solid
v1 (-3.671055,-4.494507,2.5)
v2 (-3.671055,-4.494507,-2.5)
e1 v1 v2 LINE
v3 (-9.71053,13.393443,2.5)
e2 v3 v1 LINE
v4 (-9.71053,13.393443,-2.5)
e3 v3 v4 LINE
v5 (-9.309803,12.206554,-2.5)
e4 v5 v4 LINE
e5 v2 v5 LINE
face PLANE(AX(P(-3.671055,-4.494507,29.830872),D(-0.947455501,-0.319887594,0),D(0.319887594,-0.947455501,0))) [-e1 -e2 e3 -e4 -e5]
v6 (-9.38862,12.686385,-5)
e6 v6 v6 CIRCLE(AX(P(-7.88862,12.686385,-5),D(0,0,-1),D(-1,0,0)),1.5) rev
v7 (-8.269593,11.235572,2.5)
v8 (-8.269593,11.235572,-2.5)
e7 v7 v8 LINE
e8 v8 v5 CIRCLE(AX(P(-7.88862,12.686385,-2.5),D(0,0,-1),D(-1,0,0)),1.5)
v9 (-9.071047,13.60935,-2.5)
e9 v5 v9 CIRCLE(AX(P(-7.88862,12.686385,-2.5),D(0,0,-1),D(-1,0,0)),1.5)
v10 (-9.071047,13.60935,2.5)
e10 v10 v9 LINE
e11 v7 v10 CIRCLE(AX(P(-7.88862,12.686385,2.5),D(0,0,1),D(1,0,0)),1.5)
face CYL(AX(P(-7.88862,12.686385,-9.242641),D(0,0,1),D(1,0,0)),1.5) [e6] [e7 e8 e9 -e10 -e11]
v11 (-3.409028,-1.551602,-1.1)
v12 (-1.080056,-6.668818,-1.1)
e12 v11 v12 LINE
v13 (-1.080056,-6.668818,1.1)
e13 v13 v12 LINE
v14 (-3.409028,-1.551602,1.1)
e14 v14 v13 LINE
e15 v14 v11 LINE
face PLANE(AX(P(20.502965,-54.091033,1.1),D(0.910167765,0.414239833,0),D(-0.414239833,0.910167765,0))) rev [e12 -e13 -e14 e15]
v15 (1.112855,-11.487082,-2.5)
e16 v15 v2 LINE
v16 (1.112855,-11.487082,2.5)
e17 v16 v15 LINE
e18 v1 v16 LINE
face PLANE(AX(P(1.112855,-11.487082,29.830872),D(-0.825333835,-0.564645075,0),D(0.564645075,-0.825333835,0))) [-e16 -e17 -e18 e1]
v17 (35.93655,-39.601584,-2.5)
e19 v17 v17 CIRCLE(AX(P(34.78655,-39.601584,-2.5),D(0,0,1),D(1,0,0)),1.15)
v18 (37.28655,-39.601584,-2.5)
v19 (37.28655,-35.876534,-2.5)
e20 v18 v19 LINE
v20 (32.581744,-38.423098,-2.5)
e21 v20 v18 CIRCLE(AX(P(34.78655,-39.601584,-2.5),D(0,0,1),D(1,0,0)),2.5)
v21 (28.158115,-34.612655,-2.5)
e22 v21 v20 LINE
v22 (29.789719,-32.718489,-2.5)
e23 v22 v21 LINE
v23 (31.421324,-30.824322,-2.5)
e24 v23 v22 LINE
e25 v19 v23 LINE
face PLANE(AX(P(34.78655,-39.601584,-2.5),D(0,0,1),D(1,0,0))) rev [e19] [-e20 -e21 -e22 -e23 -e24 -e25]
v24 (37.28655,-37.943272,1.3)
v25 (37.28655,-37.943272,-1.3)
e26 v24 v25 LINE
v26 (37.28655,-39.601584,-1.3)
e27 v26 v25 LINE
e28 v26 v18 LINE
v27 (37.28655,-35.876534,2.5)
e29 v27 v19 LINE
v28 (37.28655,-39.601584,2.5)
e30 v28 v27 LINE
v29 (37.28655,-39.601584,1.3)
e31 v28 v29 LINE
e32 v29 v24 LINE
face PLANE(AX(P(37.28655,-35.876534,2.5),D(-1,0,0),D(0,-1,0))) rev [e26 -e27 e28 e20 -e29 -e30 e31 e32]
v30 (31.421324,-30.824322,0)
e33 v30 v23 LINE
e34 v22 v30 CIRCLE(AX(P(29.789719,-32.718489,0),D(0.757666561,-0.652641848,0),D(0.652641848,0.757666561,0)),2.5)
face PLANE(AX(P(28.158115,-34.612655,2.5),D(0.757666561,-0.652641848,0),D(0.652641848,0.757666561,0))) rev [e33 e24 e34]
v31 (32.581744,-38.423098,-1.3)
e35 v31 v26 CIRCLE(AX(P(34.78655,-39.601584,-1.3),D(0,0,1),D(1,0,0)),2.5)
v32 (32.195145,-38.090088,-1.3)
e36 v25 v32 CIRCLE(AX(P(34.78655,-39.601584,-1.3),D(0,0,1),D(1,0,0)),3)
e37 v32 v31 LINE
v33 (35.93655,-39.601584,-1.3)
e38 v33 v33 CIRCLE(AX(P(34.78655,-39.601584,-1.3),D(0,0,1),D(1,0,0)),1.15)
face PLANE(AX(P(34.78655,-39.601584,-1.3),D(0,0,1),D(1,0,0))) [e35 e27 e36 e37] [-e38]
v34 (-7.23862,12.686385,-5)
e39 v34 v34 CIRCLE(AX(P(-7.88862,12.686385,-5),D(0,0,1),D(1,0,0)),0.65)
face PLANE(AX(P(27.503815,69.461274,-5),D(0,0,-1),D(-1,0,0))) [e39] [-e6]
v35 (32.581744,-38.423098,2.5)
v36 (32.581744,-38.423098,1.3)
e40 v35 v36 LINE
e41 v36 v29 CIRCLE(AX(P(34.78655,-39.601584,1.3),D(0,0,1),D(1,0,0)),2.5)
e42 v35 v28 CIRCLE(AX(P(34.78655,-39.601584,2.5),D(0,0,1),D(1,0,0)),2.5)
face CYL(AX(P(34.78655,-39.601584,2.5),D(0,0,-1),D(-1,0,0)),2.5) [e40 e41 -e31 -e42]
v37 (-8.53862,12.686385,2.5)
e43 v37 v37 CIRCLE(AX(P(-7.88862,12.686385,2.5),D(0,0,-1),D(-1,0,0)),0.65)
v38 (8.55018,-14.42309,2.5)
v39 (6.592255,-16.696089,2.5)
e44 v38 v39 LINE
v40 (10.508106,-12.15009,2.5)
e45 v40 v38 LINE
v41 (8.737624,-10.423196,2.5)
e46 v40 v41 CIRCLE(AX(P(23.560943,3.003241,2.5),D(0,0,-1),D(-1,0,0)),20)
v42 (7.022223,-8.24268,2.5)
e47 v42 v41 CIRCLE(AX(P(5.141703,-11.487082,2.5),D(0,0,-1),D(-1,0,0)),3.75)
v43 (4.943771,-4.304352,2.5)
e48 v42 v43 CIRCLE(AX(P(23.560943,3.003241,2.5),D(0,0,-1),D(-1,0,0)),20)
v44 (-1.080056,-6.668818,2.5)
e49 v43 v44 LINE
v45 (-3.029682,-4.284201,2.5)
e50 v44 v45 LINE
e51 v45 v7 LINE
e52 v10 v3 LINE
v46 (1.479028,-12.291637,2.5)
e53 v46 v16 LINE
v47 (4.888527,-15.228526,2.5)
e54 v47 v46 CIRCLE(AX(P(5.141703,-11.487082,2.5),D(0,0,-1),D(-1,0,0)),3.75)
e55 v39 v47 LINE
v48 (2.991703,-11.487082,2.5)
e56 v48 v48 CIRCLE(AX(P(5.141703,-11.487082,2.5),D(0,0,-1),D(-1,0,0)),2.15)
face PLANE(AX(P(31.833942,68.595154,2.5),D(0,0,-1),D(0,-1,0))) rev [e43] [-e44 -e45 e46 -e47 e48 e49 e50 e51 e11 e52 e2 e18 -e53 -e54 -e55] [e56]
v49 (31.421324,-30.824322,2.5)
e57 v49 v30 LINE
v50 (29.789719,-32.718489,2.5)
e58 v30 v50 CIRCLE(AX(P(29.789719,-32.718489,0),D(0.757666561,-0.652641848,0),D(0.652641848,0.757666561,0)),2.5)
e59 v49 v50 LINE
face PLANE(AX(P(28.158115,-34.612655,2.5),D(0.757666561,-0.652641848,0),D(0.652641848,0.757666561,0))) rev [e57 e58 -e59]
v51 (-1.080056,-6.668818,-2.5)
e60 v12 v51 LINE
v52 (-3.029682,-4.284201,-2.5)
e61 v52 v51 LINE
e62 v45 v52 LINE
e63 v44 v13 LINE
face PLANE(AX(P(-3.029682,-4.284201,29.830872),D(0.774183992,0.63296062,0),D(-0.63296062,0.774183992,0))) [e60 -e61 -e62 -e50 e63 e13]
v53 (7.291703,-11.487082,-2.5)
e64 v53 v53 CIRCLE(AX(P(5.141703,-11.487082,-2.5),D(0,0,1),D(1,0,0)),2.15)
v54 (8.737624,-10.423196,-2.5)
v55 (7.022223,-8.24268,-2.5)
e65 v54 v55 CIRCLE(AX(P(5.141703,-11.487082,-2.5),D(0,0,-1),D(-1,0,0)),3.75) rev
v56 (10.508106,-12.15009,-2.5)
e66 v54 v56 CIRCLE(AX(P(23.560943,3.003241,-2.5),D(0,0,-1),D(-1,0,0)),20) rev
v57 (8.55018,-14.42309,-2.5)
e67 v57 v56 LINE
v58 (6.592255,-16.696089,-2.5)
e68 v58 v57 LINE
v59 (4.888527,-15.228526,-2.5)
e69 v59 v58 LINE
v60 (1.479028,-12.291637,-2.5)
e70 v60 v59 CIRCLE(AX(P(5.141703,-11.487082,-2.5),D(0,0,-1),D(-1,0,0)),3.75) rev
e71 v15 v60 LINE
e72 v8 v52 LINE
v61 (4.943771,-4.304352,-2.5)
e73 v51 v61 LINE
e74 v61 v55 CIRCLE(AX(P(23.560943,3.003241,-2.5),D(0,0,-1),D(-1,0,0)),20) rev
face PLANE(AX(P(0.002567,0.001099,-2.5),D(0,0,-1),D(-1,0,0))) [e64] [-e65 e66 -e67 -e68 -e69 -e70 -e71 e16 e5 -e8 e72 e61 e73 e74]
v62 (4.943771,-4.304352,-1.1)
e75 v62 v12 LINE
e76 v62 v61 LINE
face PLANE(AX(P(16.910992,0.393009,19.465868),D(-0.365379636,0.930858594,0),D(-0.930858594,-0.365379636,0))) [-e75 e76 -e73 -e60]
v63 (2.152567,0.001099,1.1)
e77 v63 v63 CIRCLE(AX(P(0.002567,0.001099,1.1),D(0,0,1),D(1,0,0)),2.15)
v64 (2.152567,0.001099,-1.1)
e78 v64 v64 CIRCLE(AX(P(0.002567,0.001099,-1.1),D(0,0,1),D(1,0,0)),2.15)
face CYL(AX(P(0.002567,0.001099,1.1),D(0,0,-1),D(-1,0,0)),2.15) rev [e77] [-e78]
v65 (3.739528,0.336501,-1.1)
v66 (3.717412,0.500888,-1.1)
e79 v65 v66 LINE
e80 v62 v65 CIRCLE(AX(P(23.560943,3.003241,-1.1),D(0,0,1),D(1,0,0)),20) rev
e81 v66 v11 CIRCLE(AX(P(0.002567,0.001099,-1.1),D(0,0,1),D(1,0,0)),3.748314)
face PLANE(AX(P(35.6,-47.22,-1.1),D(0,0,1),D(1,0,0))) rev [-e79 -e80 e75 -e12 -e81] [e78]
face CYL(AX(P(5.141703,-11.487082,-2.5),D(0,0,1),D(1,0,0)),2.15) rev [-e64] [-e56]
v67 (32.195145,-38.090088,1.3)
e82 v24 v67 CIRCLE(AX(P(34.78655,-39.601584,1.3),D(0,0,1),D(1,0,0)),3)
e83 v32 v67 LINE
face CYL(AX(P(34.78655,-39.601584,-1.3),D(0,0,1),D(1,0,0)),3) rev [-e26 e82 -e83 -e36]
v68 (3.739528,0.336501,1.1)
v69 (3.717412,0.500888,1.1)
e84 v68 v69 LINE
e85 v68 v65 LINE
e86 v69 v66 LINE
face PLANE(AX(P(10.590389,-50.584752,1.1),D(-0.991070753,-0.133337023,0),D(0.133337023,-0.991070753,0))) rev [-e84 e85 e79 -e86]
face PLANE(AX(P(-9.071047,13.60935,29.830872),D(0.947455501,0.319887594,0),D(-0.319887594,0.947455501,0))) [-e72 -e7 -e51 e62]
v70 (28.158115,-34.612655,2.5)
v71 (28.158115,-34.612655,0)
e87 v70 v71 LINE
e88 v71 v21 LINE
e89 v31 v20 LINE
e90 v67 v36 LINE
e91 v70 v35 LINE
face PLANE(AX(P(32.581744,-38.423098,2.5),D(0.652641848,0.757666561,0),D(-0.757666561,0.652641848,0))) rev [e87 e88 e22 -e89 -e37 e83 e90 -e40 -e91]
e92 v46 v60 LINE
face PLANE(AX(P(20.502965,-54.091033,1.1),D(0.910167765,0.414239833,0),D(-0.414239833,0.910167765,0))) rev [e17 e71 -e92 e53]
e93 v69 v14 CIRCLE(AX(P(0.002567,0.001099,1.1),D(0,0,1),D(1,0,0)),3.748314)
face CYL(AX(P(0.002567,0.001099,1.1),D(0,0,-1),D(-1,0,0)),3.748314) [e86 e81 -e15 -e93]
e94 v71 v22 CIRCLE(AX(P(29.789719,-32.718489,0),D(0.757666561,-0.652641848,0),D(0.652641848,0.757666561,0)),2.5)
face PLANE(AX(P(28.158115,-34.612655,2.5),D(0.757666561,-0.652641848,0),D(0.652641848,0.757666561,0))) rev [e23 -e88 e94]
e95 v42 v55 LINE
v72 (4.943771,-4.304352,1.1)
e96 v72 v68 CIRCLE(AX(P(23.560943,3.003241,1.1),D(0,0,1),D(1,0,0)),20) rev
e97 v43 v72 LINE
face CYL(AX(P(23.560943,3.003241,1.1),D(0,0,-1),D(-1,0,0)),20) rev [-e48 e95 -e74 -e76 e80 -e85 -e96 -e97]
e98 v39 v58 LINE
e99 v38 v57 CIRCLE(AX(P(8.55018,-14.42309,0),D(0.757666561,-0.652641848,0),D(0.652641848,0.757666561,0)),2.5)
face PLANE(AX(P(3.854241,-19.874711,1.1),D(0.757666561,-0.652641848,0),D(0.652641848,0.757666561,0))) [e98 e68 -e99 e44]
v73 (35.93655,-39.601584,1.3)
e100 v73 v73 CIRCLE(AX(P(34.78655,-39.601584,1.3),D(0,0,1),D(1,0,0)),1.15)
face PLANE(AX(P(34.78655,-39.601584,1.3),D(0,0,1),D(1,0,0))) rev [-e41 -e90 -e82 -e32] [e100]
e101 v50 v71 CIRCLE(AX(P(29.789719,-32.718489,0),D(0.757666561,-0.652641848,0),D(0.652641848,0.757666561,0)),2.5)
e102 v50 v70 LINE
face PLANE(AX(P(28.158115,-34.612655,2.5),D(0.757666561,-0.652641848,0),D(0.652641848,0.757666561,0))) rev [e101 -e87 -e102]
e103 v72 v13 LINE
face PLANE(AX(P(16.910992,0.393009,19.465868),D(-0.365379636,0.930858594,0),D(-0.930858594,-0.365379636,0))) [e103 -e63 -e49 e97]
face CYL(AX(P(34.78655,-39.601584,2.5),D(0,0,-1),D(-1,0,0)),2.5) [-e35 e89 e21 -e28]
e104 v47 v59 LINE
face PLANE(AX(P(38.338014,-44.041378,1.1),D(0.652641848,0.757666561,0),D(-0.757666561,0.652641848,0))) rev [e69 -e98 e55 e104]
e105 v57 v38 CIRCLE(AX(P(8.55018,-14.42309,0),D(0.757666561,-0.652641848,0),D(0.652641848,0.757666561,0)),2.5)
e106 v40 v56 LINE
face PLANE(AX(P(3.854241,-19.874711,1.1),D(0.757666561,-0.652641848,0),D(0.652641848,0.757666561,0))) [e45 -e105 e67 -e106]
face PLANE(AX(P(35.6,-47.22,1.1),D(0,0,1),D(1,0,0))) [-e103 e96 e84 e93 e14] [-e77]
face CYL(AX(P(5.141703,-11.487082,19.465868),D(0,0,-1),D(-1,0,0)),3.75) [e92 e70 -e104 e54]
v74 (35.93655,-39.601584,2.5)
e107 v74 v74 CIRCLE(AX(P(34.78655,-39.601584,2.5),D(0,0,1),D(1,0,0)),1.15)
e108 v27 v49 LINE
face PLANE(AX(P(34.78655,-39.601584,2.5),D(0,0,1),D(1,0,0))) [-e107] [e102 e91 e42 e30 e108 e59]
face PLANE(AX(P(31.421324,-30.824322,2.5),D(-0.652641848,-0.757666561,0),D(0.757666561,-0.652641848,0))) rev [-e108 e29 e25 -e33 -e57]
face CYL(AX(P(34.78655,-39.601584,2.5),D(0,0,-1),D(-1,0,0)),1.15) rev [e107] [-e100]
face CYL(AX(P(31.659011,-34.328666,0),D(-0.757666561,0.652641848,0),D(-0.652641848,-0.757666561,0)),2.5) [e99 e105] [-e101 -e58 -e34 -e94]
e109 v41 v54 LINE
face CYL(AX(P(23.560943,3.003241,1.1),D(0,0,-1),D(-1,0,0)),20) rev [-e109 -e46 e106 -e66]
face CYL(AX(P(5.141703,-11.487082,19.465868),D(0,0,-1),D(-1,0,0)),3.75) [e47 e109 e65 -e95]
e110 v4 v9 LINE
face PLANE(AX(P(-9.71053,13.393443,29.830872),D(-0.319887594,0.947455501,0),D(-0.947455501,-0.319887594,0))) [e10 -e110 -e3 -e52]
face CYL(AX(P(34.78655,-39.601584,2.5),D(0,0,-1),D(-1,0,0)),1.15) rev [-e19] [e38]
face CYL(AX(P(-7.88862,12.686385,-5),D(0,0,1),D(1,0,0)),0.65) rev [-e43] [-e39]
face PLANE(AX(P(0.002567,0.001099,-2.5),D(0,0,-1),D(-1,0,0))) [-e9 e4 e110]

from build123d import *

# Parameters (mm, degrees)
SKETCH1_R               = 3.748314074
SKETCH1_R_2             = 2.15
BOSS_EXTRUDE1_DEPTH     = 1.1
BOSS_EXTRUDE2_START     = -2.5
BOSS_EXTRUDE2_DEPTH     = 5
SKETCH3_R               = 2.5
BOSS_EXTRUDE3_DEPTH     = 30.5
BOSS_EXTRUDE4_REACH     = 66.583
CUT_EXTRUDE1_DEPTH      = 77.014827373
CUT_EXTRUDE1_DEPTH_BACK = 77.014827373
SKETCH5_R               = 2.15
SKETCH6_R               = 1.15
BOSS_EXTRUDE5_DEPTH     = 2.5
SKETCH7_R               = 3
CUT_EXTRUDE2_DEPTH      = 1.3
SKETCH8_R               = 1.5
BOSS_EXTRUDE6_DEPTH     = 7.5
CUT_EXTRUDE3_DEPTH      = 77.681407452
CUT_EXTRUDE3_DEPTH_BACK = 77.681407452
SKETCH9_R               = 0.65


# Read off the part's stored shape, not the designer's step: Boss-Extrude2
with BuildPart() as part:
    # Sketch1 → Boss-Extrude1 (new, symmetric)
    # profile 1 of 2: a face of its own
    with BuildSketch(Plane.XY):
        with BuildLine():
            Line((-29.007745084, 30.523910578), (-25.091893995, 35.069909945))
            ThreePointArc((-25.091893995, 35.069909945), (-29.621942143, 40.692126277), (-31.860472098, 47.55650071))
            Line((-31.860472098, 47.55650071), (-31.88258847, 47.720887837))
            ThreePointArc((-31.88258847, 47.720887837), (-31.857495615, 47.471553034), (-31.84911885, 47.221098797))
            ThreePointArc((-31.84911885, 47.221098797), (-34.80303687, 43.557931682), (-39.009027568, 45.6683978))
            Line((-39.009027568, 45.6683978), (-34.12097225, 34.928362615))
            Line((-34.12097225, 34.928362615), (-29.007745084, 30.523910578))
        make_face()
    # profile 2 of 2: a face of its own
    with BuildSketch(Plane.XY):
        with Locations((-35.597432924, 47.221098797)):
            Circle(SKETCH1_R)
        with Locations((-35.597432924, 47.221098797)):
            Circle(SKETCH1_R_2, mode=Mode.SUBTRACT)
    extrude(amount=BOSS_EXTRUDE1_DEPTH, both=True)

    # Boss-Extrude2 outline → Boss-Extrude2 (add)
    with BuildSketch(Plane.XY.offset(BOSS_EXTRUDE2_START)):
        with BuildLine():
            ThreePointArc((-25.091893995, 35.069909945), (-26.003854199, 35.905963494), (-26.862376119, 36.796804144))
            ThreePointArc((-26.862376119, 36.796804144), (-27.511007835, 38.051535597), (-28.577777167, 38.977320299))
            ThreePointArc((-28.577777167, 38.977320299), (-29.726956647, 40.888456377), (-30.656228901, 42.915648441))
            Line((-30.656228901, 42.915648441), (-36.680056275, 40.551182055))
            Line((-36.680056275, 40.551182055), (-34.12097225, 34.928362615))
            ThreePointArc((-34.12097225, 34.928362615), (-32.905703874, 32.891668535), (-30.711472725, 31.991474297))
            Line((-30.711472725, 31.991474297), (-29.007745084, 30.523910578))
            Line((-29.007745084, 30.523910578), (-25.091893995, 35.069909945))
        make_face()
    extrude(amount=BOSS_EXTRUDE2_DEPTH)

    # Sketch3 → Boss-Extrude3 (add)
    with BuildSketch(Plane(origin=(-31.745759068, 27.345288728, 0), x_dir=(0, 0, -1), z_dir=(0.7576665611269928, -0.6526418482981281, 0))):
        with Locations((0, 7.195277993)):
            Circle(SKETCH3_R)
    extrude(amount=BOSS_EXTRUDE3_DEPTH)

    # Boss-Extrude4: up to this face of the body (flat: up to its plane)
    boss_extrude4_end = Plane(part.part.faces().sort_by_distance((-30.992912772, 36.816549457, 2.5))[0])
    # Sketch4 → Boss-Extrude4 (add, up to the picked face)
    with BuildSketch(Plane(origin=(0, 0, -2.5), x_dir=(-1, 0, 0), z_dir=(0, 0, -1)), mode=Mode.PRIVATE) as boss_extrude4_sk1:
        Polygon((44.67104718, 60.829350293), (38.62968166, 42.935799229), (36.680056275, 40.551182055), (34.487145344, 35.732918139), (39.271055483, 42.725492907), (45.31052994, 60.613442948), align=None)
    boss_extrude4_tool1 = split(extrude(boss_extrude4_sk1.sketch, amount=-BOSS_EXTRUDE4_REACH, mode=Mode.PRIVATE), bisect_by=boss_extrude4_end, keep=Keep.BOTH, mode=Mode.PRIVATE)
    add(boss_extrude4_tool1.solids().sort_by(Axis((-40.62976, 48.582602, -2.5), (0, 0, 1)))[0])

    # Sketch5 → Cut-Extrude1 (cut, two sides: drawn at the far end of the back side and taken through both)
    with BuildSketch(Plane.XY.offset(2.5).offset(-CUT_EXTRUDE1_DEPTH_BACK)):
        with Locations((-30.458296942, 35.732918139)):
            Circle(SKETCH5_R)
    extrude(amount=CUT_EXTRUDE1_DEPTH + CUT_EXTRUDE1_DEPTH_BACK, mode=Mode.SUBTRACT)

    # Sketch6 → Boss-Extrude5 (add, symmetric)
    with BuildSketch(Plane.XY):
        with BuildLine():
            Line((-3.018256327, 8.79690186), (-7.441885155, 12.607344927))
            Line((-7.441885155, 12.607344927), (-4.178675914, 16.395677733))
            Line((-4.178675914, 16.395677733), (1.686549766, 11.343466212))
            Line((1.686549766, 11.343466212), (1.686549766, 7.618415505))
            ThreePointArc((1.686549766, 7.618415505), (-1.420897666, 5.193336616), (-3.018256327, 8.79690186))
        make_face()
        with Locations((-0.813450234, 7.618415505)):
            Circle(SKETCH6_R, mode=Mode.SUBTRACT)
    extrude(amount=BOSS_EXTRUDE5_DEPTH, both=True)

    # Sketch7 → Cut-Extrude2 (cut, symmetric)
    with BuildSketch(Plane.XY):
        with Locations((-0.813450234, 7.618415505)):
            Circle(SKETCH7_R)
    extrude(amount=CUT_EXTRUDE2_DEPTH, both=True, mode=Mode.SUBTRACT)

    # Sketch8 → Boss-Extrude6 (add)
    with BuildSketch(Plane.XY.offset(2.5)):
        with Locations(Location((-43.488619522, 59.906385053, 0), (0, 0, 255.286714902))):
            Circle(SKETCH8_R)
    extrude(amount=-BOSS_EXTRUDE6_DEPTH)

    # Sketch9 → Cut-Extrude3 (cut, two sides: drawn at the far end of the back side and taken through both)
    with BuildSketch(Plane.XY.offset(2.5).offset(-CUT_EXTRUDE3_DEPTH_BACK)):
        with Locations((-43.488619522, 59.906385053)):
            Circle(SKETCH9_R)
    extrude(amount=CUT_EXTRUDE3_DEPTH + CUT_EXTRUDE3_DEPTH_BACK, mode=Mode.SUBTRACT)


with BuildPart() as part_1:
    # Body-Move/Copy1: moved
    add(part.part.moved(Location((35.6, -47.22, 0))))


solid = part_1.part
